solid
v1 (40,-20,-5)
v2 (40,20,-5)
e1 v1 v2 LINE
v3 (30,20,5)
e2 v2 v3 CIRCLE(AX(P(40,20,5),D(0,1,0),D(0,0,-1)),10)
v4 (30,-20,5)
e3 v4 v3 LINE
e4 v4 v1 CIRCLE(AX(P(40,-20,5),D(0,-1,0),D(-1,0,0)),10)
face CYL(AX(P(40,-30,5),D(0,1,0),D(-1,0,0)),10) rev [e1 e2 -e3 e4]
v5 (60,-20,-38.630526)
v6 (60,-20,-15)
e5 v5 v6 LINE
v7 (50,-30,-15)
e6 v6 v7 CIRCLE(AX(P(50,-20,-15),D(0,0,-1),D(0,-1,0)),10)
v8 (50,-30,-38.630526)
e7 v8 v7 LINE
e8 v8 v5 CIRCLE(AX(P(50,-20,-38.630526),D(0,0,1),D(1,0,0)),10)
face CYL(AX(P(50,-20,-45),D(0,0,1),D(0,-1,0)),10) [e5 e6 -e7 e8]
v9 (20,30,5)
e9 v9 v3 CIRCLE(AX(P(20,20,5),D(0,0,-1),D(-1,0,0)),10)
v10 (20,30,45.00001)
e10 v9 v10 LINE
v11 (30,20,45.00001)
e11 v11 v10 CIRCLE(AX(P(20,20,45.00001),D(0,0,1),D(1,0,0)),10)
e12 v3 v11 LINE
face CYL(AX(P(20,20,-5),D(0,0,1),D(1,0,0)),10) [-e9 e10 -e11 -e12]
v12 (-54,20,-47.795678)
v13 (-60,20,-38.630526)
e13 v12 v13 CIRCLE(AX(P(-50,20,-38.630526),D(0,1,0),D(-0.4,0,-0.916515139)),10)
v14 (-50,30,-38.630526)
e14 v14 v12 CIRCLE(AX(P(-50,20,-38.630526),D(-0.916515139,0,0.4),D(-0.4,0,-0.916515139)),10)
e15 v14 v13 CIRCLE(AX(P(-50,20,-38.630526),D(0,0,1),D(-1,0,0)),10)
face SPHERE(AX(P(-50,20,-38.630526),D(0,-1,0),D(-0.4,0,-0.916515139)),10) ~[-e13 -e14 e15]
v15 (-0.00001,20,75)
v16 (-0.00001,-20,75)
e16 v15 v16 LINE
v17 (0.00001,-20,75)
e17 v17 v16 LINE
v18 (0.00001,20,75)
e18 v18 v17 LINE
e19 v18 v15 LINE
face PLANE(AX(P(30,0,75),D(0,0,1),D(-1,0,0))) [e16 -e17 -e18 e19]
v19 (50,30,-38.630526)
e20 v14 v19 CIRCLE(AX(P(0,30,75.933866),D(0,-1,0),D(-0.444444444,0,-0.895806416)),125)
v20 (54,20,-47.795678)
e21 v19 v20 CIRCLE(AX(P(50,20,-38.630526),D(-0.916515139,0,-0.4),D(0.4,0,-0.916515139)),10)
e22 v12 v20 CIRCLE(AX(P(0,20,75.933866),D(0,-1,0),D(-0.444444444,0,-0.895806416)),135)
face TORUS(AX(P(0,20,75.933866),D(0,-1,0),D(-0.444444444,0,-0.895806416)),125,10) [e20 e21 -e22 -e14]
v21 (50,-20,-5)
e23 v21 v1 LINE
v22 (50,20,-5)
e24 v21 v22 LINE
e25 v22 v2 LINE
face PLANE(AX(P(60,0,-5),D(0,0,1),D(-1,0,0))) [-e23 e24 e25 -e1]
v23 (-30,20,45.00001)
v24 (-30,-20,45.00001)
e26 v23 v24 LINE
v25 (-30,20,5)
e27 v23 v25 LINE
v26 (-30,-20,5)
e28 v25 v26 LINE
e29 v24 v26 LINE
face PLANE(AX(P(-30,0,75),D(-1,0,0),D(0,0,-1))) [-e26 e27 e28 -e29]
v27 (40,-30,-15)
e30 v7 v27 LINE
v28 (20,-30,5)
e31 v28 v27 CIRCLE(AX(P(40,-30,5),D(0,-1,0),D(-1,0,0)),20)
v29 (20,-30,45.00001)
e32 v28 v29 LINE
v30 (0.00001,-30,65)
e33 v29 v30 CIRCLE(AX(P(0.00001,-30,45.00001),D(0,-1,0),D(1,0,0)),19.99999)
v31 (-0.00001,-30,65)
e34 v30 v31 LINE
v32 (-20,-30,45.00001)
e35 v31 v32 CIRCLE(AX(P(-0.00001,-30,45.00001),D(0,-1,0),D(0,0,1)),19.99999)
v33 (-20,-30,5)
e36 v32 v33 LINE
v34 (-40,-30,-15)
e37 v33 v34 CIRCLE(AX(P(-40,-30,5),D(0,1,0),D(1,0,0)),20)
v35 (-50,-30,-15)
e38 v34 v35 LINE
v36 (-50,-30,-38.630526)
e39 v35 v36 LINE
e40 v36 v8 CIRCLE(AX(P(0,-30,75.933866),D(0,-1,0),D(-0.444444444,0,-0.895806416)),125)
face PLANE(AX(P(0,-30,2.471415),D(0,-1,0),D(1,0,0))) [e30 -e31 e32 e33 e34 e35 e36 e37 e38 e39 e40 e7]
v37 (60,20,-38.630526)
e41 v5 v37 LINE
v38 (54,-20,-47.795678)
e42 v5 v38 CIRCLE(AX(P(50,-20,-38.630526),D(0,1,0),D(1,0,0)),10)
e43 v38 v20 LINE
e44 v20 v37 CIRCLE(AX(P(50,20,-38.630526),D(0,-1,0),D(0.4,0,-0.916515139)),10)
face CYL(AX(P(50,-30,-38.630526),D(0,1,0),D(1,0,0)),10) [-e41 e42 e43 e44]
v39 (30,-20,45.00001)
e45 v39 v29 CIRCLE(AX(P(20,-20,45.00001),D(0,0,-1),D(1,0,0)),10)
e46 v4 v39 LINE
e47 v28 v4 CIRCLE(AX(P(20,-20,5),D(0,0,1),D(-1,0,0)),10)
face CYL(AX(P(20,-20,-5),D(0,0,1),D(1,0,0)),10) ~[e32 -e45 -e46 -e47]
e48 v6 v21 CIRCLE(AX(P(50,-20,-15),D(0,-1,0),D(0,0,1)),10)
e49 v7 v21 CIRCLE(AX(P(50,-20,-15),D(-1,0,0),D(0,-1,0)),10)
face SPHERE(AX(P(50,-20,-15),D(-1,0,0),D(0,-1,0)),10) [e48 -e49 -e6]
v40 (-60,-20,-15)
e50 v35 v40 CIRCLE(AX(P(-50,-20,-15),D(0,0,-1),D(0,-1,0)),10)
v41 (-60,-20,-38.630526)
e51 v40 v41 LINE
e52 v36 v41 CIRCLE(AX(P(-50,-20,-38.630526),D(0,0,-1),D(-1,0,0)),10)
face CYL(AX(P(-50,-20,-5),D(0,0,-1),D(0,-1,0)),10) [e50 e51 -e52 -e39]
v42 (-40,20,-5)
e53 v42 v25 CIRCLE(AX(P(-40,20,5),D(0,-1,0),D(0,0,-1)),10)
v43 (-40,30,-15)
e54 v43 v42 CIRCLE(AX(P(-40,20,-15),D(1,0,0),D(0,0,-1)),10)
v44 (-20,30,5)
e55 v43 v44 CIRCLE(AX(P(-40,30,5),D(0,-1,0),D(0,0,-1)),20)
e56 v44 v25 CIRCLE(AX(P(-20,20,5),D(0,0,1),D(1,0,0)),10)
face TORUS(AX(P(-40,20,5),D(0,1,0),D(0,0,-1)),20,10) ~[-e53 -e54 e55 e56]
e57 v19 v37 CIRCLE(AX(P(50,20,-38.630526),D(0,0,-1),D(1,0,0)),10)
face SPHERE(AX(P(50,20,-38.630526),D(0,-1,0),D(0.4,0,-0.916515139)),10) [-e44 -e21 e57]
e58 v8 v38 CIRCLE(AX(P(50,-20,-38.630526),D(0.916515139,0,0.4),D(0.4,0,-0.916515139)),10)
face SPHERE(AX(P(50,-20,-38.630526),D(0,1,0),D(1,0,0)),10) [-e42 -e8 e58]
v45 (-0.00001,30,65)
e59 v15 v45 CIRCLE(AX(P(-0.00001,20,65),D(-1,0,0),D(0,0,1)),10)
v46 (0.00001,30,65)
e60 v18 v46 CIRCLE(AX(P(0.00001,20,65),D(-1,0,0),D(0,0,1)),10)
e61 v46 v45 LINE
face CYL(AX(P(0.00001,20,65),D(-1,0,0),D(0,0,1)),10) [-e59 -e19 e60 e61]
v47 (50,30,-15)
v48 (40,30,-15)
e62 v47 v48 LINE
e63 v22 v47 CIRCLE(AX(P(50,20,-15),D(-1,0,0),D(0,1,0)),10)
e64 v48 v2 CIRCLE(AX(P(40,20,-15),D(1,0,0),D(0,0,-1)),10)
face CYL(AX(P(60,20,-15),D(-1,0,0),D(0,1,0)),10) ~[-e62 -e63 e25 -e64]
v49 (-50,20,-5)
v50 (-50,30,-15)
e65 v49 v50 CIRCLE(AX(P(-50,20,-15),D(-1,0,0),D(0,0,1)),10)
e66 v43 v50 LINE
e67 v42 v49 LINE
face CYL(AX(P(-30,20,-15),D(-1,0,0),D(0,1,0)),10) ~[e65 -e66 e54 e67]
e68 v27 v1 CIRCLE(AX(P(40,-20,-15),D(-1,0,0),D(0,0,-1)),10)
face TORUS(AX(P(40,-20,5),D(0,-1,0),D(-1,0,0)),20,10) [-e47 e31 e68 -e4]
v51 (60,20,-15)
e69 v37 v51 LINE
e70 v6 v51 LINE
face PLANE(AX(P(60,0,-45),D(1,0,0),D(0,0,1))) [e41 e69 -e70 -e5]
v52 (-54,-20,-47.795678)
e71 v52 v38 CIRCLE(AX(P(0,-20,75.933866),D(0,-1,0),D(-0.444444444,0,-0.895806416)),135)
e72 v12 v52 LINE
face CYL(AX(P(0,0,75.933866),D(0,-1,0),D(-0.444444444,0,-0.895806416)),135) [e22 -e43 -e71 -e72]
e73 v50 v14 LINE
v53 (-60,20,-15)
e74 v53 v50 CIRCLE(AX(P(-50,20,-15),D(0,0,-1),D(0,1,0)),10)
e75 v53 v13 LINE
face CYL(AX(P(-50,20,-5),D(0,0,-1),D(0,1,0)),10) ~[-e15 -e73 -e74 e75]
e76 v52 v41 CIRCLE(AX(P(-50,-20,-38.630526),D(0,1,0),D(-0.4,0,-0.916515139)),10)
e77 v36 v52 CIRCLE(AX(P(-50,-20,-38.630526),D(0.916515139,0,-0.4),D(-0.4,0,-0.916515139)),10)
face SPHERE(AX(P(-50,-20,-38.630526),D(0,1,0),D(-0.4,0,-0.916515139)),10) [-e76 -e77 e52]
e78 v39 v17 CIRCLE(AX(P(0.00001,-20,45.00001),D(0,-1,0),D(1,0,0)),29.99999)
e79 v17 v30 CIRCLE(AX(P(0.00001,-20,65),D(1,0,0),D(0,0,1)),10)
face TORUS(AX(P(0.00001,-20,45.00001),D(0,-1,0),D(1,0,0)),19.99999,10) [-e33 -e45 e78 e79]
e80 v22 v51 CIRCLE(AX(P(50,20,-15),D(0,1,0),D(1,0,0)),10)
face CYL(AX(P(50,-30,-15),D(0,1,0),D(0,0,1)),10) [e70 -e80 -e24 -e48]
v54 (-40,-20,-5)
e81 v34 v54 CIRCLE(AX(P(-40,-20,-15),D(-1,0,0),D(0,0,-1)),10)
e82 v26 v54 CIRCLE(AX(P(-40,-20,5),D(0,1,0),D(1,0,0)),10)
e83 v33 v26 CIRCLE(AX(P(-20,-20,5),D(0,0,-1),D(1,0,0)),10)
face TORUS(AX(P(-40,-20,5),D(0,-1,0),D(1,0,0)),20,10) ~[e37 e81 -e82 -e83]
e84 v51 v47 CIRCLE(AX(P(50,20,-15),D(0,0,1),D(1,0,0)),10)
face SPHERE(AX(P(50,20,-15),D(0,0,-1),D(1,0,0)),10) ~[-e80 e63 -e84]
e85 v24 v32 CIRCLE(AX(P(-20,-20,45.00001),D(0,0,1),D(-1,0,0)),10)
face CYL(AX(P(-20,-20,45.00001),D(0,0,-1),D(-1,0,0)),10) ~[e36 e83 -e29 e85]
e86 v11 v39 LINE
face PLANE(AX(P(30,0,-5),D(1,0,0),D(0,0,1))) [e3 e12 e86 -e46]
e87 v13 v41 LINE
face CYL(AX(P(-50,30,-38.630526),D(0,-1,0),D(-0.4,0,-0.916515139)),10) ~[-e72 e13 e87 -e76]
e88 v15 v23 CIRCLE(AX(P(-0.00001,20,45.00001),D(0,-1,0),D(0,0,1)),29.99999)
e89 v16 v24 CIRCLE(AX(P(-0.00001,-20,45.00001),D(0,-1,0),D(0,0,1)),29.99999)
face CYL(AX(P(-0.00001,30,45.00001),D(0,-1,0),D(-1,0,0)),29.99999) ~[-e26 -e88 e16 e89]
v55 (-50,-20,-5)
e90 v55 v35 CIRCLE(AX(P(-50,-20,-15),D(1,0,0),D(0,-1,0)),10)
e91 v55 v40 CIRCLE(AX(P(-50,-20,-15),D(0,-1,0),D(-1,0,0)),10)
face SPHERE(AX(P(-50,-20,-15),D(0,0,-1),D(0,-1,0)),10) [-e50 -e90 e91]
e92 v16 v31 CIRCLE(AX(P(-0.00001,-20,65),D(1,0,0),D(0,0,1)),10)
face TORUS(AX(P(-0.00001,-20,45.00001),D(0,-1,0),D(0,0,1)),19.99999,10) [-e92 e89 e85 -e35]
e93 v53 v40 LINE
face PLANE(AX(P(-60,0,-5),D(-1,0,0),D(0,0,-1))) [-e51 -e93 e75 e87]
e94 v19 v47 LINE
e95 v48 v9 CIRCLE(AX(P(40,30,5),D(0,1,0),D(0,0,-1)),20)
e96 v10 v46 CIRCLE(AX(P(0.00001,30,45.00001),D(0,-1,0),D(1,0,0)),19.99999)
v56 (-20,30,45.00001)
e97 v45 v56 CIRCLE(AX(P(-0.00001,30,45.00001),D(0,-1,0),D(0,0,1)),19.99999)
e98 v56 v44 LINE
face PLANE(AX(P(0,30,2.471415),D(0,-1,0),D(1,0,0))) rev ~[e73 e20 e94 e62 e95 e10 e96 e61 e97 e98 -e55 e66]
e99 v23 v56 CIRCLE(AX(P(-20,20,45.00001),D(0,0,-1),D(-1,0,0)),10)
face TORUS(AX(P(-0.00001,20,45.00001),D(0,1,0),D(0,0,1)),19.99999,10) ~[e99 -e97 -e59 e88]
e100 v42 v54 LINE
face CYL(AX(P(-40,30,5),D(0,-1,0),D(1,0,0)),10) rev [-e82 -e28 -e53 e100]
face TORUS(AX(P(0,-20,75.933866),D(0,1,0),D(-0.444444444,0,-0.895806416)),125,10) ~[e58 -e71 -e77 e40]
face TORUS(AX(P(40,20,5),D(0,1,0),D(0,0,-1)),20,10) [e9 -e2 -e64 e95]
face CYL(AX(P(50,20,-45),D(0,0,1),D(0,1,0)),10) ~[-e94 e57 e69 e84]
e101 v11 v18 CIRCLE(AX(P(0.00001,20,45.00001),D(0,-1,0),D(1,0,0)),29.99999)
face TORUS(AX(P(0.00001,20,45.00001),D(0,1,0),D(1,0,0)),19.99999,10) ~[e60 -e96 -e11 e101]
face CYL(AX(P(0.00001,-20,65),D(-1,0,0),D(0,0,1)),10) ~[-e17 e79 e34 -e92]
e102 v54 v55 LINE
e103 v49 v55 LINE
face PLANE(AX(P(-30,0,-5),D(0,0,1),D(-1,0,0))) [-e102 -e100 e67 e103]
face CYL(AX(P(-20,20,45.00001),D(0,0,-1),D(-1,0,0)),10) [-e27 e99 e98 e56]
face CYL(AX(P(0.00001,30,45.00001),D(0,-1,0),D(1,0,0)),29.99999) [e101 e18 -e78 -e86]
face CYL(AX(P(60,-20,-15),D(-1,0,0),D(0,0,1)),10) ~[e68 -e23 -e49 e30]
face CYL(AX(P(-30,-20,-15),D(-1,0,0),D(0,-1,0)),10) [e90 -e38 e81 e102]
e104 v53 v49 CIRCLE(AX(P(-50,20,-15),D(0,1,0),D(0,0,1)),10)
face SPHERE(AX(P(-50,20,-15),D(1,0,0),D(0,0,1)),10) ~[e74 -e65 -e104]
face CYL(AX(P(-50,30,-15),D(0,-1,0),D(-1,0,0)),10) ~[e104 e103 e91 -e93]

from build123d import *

# Parameters (mm, degrees)
F1_DEPTH = 30
F2_R     = 29.99999
F3_R     = 10


# Not quite as in the source:
# - a fillet or chamfer is up to 0.001 mm smaller than in the source, because OpenCascade refuses the exact size


with BuildPart() as f1:
    # F0 (on Front) → F1 (new body, symmetric)
    with BuildSketch(Plane.XZ):
        with BuildLine():
            Line((30, -5), (30, 75))
            Line((30, 75), (-30, 75))
            Line((-30, 75), (-30, -5))
            Line((-30, -5), (-60, -5))
            Line((-60, -5), (-60, -45))
            ThreePointArc((-60, -45), (0, -59.0661337755), (60, -45))
            Line((60, -45), (60, -5))
            Line((60, -5), (30, -5))
        make_face()
    extrude(amount=F1_DEPTH, both=True)

    # F2 (radius 30 in the source; OpenCascade refuses exactly that, so slightly less here)
    f2_edges = [f1.edges().sort_by_distance(p)[0] for p in [
        (30, 0, 75),
        (-30, 0, 75),
    ]]
    fillet(f2_edges, radius=F2_R)

    # F3
    f3_edges = [f1.edges().sort_by_distance(p)[0] for p in [
        (30, -30, 20.000005),
        (21.213206, -30, 66.213206),
        (45, -30, -5),
        (0, -30, 75),
        (60, -30, -25),
        (-21.213206, -30, 66.213206),
        (0, -30, -59.066134),
        (-30, -30, 20.000005),
        (-60, -30, -25),
        (-45, -30, -5),
        (30, 30, 20.000005),
        (30, 0, 45.00001),
        (30, 0, -5),
        (60, 30, -25),
        (60, 0, -5),
        (60, 0, -45),
        (-30, 0, -5),
        (-45, 30, -5),
        (-60, 0, -5),
        (21.213206, 30, 66.213206),
        (45, 30, -5),
        (0, 30, 75),
        (-21.213206, 30, 66.213206),
        (0, 30, -59.066134),
        (-30, 30, 20.000005),
        (-60, 30, -25),
        (-60, 0, -45),
    ]]
    fillet(f3_edges, radius=F3_R)


solid = f1.part
